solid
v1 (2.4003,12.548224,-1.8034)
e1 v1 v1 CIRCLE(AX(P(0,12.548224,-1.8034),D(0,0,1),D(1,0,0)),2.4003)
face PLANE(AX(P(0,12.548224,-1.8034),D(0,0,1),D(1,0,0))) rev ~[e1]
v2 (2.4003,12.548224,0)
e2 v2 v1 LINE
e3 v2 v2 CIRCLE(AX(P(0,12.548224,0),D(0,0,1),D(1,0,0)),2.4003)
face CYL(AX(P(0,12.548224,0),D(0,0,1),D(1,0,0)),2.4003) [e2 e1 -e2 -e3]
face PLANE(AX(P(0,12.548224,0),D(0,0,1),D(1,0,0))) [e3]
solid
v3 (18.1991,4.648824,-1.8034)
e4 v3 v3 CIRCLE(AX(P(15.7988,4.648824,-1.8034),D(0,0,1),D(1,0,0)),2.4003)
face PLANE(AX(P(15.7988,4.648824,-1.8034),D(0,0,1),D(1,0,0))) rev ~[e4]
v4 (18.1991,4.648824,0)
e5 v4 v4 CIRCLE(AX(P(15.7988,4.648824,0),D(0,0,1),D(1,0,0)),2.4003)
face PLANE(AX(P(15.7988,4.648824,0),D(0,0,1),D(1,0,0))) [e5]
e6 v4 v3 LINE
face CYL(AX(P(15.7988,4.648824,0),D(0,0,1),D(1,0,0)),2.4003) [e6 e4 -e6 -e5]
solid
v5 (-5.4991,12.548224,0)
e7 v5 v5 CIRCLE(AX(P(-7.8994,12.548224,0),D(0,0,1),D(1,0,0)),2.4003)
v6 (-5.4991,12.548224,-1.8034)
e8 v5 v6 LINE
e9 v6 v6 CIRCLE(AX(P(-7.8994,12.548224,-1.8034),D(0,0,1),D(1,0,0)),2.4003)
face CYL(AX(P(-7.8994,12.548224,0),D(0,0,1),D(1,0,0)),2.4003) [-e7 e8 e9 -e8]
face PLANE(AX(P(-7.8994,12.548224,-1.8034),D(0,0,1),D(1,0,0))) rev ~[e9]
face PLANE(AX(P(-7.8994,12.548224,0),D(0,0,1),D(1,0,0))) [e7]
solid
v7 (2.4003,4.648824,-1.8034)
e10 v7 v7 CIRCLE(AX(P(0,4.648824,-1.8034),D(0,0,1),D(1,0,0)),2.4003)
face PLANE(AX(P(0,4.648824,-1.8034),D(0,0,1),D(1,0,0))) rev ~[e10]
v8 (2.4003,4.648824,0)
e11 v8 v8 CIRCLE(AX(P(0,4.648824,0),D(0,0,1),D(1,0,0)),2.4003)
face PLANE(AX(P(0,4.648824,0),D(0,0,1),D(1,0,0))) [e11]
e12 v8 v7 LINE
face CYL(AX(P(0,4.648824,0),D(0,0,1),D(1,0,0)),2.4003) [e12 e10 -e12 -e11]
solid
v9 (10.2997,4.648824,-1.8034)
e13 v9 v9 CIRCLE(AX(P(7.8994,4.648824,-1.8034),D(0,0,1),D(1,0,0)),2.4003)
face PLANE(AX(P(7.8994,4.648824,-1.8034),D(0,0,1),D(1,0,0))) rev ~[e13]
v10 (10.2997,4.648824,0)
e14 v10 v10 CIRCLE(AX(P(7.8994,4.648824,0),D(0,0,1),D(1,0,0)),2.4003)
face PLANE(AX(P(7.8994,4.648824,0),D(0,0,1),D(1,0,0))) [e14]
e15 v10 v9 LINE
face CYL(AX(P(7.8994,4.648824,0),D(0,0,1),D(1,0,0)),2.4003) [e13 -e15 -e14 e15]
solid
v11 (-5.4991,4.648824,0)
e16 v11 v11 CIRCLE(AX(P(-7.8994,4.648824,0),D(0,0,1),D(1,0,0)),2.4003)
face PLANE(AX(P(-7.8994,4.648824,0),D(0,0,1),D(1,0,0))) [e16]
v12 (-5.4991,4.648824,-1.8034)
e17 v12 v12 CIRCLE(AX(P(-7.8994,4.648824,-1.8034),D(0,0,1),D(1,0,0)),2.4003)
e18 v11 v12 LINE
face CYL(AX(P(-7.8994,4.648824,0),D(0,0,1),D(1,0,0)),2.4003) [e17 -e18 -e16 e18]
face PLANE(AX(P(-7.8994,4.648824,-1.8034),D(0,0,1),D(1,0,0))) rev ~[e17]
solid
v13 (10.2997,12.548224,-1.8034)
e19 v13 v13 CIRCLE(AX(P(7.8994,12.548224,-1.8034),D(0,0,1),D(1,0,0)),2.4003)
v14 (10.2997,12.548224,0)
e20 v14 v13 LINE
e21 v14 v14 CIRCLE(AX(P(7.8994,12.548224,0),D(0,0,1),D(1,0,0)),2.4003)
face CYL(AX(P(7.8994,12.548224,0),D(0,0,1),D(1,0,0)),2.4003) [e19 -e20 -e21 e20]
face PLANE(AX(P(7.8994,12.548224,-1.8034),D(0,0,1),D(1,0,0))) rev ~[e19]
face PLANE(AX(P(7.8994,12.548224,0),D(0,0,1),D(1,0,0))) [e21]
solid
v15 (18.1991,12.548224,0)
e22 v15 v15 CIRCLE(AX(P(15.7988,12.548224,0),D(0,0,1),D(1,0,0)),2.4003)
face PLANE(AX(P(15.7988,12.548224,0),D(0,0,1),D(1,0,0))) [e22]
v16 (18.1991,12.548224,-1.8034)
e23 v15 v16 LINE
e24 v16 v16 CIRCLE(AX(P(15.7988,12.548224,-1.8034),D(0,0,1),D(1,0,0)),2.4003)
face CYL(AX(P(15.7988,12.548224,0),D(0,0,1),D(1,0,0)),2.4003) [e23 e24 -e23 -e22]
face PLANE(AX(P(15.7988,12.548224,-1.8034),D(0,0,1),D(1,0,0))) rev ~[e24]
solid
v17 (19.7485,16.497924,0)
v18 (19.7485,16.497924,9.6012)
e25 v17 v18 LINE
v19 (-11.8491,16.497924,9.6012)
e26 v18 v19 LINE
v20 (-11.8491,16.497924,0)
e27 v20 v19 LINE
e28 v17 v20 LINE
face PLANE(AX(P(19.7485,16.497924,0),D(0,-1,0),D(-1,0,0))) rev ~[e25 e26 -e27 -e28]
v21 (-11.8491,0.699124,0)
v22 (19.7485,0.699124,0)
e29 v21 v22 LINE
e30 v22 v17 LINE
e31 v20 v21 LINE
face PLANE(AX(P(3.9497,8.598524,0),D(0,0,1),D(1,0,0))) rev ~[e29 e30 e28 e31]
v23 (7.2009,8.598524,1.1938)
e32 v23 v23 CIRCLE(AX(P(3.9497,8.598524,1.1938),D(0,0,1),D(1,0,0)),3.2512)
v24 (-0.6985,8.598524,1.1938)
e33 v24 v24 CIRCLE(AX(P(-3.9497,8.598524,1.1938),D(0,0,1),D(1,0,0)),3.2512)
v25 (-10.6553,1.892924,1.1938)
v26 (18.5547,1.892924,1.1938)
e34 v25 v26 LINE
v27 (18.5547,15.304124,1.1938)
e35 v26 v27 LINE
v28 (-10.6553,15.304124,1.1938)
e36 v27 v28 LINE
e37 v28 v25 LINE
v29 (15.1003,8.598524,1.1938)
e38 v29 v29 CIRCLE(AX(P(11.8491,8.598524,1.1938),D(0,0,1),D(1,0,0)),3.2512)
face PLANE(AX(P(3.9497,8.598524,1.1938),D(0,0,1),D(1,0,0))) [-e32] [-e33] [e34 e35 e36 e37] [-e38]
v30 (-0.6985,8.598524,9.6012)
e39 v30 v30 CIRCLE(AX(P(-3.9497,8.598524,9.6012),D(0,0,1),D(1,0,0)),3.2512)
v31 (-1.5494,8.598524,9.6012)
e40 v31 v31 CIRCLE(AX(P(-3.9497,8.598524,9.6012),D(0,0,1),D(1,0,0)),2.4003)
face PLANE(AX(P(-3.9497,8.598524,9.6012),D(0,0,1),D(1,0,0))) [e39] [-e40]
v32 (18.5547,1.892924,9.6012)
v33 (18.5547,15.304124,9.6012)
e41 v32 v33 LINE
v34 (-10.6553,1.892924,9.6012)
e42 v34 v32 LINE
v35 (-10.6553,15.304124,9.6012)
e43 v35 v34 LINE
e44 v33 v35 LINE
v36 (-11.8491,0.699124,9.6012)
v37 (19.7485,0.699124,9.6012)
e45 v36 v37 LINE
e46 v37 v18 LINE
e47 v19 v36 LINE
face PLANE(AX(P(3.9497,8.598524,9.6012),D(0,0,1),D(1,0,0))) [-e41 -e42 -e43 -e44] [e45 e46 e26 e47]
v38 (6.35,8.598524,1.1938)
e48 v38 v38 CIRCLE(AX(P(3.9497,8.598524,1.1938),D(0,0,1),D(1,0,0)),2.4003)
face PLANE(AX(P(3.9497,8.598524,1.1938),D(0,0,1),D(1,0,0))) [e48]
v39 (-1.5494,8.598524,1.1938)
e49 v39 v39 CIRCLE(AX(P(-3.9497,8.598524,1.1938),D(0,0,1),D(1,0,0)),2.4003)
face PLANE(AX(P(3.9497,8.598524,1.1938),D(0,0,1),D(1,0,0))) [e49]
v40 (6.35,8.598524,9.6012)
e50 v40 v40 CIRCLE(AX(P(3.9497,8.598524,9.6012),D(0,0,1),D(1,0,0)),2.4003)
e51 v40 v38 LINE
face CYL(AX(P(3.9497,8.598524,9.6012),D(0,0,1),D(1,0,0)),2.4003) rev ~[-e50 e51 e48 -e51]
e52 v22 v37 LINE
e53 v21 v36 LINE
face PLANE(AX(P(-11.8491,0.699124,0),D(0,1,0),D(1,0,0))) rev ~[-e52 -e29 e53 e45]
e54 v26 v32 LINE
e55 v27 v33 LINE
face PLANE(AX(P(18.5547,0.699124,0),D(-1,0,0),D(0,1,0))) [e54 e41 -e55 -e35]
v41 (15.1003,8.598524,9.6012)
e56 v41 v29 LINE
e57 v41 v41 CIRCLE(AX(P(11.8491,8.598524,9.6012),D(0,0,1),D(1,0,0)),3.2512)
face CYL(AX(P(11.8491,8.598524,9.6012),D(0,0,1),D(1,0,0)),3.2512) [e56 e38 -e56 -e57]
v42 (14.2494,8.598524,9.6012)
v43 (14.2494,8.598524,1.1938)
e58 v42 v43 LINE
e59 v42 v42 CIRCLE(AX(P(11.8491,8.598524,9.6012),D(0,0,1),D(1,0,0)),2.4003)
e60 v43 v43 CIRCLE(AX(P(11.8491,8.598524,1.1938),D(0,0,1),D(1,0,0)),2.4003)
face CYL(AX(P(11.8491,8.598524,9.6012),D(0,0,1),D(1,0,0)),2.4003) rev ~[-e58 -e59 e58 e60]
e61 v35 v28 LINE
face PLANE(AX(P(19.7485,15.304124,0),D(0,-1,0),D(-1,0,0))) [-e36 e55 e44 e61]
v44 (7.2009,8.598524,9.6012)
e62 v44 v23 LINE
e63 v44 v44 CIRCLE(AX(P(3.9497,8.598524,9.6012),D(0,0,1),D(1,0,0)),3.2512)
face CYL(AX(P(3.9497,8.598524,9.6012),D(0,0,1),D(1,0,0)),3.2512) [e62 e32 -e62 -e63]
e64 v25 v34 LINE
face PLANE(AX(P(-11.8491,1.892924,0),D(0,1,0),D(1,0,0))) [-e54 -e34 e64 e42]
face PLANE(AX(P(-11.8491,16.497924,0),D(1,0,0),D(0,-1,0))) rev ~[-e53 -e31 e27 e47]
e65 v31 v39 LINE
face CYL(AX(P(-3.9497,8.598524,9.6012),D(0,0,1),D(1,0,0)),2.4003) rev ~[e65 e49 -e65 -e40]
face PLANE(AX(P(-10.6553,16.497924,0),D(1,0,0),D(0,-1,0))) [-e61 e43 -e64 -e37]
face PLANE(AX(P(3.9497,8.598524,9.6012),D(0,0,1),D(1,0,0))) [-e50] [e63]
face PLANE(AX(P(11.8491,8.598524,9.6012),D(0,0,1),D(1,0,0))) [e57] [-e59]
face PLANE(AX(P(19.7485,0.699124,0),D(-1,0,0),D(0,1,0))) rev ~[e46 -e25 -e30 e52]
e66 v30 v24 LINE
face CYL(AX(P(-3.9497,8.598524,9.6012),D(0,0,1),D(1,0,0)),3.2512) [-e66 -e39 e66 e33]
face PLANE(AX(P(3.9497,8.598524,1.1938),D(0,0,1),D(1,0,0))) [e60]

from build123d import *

# Parameters (mm, degrees)
F0_R     = 2.4003
F1_DEPTH = 9.6012
F2_DEPTH = 1.8034
F3_T     = -1.1938
F4_R     = 3.2512
F4_R_2   = 2.4003
F5_DEPTH = 9.6012


# Not quite as in the source:
# - a feature names something its author has since deleted; it is built from what else it names


with BuildPart() as f1:
    # F0 (on Top) → F1 (new body)
    with BuildSketch(Plane.XY):
        Polygon((-11.8491, 16.497923825), (-11.8491, 8.598523825), (-11.8491, 0.699123825), (-3.9497, 0.699123825), (3.9497, 0.699123825), (11.8491, 0.699123825), (19.7485, 0.699123825), (19.7485, 8.598523825), (19.7485, 16.497923825), (11.8491, 16.497923825), (3.9497, 16.497923825), (-3.9497, 16.497923825), align=None)
        with Locations((-7.8994, 4.648823825)):
            Circle(F0_R, mode=Mode.SUBTRACT)
        with Locations((0, 4.648823825)):
            Circle(F0_R, mode=Mode.SUBTRACT)
        with Locations((7.8994, 4.648823825)):
            Circle(F0_R, mode=Mode.SUBTRACT)
        with Locations((15.7988, 4.648823825)):
            Circle(F0_R, mode=Mode.SUBTRACT)
        with Locations((-7.8994, 12.548223825)):
            Circle(F0_R, mode=Mode.SUBTRACT)
        with Locations((0, 12.548223825)):
            Circle(F0_R, mode=Mode.SUBTRACT)
        with Locations((7.8994, 12.548223825)):
            Circle(F0_R, mode=Mode.SUBTRACT)
        with Locations((15.7988, 12.548223825)):
            Circle(F0_R, mode=Mode.SUBTRACT)
        with Locations((-7.8994, 4.648823825)):
            Circle(F0_R)
        with Locations((-7.8994, 12.548223825)):
            Circle(F0_R)
        with Locations((0, 4.648823825)):
            Circle(F0_R)
        with Locations((0, 12.548223825)):
            Circle(F0_R)
        with Locations((7.8994, 4.648823825)):
            Circle(F0_R)
        with Locations((15.7988, 4.648823825)):
            Circle(F0_R)
        with Locations((15.7988, 12.548223825)):
            Circle(F0_R)
        with Locations((7.8994, 12.548223825)):
            Circle(F0_R)
    extrude(amount=F1_DEPTH)

    # F3
    f3_openings = [f1.faces().sort_by_distance(p)[0] for p in [
        (3.9497, 8.598524, 9.6012),
    ]]
    offset(amount=F3_T, openings=f3_openings)

    # F4 (on face) → F5 (join)
    with BuildSketch(Plane.XY.offset(9.6012)):
        with Locations((-3.9497, 8.598523825)):
            Circle(F4_R)
        with Locations((-3.9497, 8.598523825)):
            Circle(F4_R_2, mode=Mode.SUBTRACT)
        with Locations((3.9497, 8.598523825)):
            Circle(F4_R)
        with Locations((3.9497, 8.598523825)):
            Circle(F4_R_2, mode=Mode.SUBTRACT)
        with Locations((11.8491, 8.598523825)):
            Circle(F4_R)
        with Locations((11.8491, 8.598523825)):
            Circle(F4_R_2, mode=Mode.SUBTRACT)
    extrude(amount=-F5_DEPTH)


with BuildPart() as f2:
    # F0 (on Top) → F2 (new body)
    with BuildSketch(Plane.XY):
        with Locations((-7.8994, 4.648823825)):
            Circle(F0_R)
    extrude(amount=-F2_DEPTH)


with BuildPart() as f2b:
    # F0 (on Top) → F2, piece 2 (new body)
    with BuildSketch(Plane.XY):
        with Locations((0, 4.648823825)):
            Circle(F0_R)
    extrude(amount=-F2_DEPTH)


with BuildPart() as f2c:
    # F0 (on Top) → F2, piece 3 (new body)
    with BuildSketch(Plane.XY):
        with Locations((0, 12.548223825)):
            Circle(F0_R)
    extrude(amount=-F2_DEPTH)


with BuildPart() as f2d:
    # F0 (on Top) → F2, piece 4 (new body)
    with BuildSketch(Plane.XY):
        with Locations((-7.8994, 12.548223825)):
            Circle(F0_R)
    extrude(amount=-F2_DEPTH)


with BuildPart() as f2e:
    # F0 (on Top) → F2, piece 5 (new body)
    with BuildSketch(Plane.XY):
        with Locations((7.8994, 4.648823825)):
            Circle(F0_R)
    extrude(amount=-F2_DEPTH)


with BuildPart() as f2f:
    # F0 (on Top) → F2, piece 6 (new body)
    with BuildSketch(Plane.XY):
        with Locations((7.8994, 12.548223825)):
            Circle(F0_R)
    extrude(amount=-F2_DEPTH)


with BuildPart() as f2g:
    # F0 (on Top) → F2, piece 7 (new body)
    with BuildSketch(Plane.XY):
        with Locations((15.7988, 4.648823825)):
            Circle(F0_R)
    extrude(amount=-F2_DEPTH)


with BuildPart() as f2h:
    # F0 (on Top) → F2, piece 8 (new body)
    with BuildSketch(Plane.XY):
        with Locations((15.7988, 12.548223825)):
            Circle(F0_R)
    extrude(amount=-F2_DEPTH)


solid = Compound([f1.part, f2.part, f2b.part, f2c.part, f2d.part, f2e.part, f2f.part, f2g.part, f2h.part])
